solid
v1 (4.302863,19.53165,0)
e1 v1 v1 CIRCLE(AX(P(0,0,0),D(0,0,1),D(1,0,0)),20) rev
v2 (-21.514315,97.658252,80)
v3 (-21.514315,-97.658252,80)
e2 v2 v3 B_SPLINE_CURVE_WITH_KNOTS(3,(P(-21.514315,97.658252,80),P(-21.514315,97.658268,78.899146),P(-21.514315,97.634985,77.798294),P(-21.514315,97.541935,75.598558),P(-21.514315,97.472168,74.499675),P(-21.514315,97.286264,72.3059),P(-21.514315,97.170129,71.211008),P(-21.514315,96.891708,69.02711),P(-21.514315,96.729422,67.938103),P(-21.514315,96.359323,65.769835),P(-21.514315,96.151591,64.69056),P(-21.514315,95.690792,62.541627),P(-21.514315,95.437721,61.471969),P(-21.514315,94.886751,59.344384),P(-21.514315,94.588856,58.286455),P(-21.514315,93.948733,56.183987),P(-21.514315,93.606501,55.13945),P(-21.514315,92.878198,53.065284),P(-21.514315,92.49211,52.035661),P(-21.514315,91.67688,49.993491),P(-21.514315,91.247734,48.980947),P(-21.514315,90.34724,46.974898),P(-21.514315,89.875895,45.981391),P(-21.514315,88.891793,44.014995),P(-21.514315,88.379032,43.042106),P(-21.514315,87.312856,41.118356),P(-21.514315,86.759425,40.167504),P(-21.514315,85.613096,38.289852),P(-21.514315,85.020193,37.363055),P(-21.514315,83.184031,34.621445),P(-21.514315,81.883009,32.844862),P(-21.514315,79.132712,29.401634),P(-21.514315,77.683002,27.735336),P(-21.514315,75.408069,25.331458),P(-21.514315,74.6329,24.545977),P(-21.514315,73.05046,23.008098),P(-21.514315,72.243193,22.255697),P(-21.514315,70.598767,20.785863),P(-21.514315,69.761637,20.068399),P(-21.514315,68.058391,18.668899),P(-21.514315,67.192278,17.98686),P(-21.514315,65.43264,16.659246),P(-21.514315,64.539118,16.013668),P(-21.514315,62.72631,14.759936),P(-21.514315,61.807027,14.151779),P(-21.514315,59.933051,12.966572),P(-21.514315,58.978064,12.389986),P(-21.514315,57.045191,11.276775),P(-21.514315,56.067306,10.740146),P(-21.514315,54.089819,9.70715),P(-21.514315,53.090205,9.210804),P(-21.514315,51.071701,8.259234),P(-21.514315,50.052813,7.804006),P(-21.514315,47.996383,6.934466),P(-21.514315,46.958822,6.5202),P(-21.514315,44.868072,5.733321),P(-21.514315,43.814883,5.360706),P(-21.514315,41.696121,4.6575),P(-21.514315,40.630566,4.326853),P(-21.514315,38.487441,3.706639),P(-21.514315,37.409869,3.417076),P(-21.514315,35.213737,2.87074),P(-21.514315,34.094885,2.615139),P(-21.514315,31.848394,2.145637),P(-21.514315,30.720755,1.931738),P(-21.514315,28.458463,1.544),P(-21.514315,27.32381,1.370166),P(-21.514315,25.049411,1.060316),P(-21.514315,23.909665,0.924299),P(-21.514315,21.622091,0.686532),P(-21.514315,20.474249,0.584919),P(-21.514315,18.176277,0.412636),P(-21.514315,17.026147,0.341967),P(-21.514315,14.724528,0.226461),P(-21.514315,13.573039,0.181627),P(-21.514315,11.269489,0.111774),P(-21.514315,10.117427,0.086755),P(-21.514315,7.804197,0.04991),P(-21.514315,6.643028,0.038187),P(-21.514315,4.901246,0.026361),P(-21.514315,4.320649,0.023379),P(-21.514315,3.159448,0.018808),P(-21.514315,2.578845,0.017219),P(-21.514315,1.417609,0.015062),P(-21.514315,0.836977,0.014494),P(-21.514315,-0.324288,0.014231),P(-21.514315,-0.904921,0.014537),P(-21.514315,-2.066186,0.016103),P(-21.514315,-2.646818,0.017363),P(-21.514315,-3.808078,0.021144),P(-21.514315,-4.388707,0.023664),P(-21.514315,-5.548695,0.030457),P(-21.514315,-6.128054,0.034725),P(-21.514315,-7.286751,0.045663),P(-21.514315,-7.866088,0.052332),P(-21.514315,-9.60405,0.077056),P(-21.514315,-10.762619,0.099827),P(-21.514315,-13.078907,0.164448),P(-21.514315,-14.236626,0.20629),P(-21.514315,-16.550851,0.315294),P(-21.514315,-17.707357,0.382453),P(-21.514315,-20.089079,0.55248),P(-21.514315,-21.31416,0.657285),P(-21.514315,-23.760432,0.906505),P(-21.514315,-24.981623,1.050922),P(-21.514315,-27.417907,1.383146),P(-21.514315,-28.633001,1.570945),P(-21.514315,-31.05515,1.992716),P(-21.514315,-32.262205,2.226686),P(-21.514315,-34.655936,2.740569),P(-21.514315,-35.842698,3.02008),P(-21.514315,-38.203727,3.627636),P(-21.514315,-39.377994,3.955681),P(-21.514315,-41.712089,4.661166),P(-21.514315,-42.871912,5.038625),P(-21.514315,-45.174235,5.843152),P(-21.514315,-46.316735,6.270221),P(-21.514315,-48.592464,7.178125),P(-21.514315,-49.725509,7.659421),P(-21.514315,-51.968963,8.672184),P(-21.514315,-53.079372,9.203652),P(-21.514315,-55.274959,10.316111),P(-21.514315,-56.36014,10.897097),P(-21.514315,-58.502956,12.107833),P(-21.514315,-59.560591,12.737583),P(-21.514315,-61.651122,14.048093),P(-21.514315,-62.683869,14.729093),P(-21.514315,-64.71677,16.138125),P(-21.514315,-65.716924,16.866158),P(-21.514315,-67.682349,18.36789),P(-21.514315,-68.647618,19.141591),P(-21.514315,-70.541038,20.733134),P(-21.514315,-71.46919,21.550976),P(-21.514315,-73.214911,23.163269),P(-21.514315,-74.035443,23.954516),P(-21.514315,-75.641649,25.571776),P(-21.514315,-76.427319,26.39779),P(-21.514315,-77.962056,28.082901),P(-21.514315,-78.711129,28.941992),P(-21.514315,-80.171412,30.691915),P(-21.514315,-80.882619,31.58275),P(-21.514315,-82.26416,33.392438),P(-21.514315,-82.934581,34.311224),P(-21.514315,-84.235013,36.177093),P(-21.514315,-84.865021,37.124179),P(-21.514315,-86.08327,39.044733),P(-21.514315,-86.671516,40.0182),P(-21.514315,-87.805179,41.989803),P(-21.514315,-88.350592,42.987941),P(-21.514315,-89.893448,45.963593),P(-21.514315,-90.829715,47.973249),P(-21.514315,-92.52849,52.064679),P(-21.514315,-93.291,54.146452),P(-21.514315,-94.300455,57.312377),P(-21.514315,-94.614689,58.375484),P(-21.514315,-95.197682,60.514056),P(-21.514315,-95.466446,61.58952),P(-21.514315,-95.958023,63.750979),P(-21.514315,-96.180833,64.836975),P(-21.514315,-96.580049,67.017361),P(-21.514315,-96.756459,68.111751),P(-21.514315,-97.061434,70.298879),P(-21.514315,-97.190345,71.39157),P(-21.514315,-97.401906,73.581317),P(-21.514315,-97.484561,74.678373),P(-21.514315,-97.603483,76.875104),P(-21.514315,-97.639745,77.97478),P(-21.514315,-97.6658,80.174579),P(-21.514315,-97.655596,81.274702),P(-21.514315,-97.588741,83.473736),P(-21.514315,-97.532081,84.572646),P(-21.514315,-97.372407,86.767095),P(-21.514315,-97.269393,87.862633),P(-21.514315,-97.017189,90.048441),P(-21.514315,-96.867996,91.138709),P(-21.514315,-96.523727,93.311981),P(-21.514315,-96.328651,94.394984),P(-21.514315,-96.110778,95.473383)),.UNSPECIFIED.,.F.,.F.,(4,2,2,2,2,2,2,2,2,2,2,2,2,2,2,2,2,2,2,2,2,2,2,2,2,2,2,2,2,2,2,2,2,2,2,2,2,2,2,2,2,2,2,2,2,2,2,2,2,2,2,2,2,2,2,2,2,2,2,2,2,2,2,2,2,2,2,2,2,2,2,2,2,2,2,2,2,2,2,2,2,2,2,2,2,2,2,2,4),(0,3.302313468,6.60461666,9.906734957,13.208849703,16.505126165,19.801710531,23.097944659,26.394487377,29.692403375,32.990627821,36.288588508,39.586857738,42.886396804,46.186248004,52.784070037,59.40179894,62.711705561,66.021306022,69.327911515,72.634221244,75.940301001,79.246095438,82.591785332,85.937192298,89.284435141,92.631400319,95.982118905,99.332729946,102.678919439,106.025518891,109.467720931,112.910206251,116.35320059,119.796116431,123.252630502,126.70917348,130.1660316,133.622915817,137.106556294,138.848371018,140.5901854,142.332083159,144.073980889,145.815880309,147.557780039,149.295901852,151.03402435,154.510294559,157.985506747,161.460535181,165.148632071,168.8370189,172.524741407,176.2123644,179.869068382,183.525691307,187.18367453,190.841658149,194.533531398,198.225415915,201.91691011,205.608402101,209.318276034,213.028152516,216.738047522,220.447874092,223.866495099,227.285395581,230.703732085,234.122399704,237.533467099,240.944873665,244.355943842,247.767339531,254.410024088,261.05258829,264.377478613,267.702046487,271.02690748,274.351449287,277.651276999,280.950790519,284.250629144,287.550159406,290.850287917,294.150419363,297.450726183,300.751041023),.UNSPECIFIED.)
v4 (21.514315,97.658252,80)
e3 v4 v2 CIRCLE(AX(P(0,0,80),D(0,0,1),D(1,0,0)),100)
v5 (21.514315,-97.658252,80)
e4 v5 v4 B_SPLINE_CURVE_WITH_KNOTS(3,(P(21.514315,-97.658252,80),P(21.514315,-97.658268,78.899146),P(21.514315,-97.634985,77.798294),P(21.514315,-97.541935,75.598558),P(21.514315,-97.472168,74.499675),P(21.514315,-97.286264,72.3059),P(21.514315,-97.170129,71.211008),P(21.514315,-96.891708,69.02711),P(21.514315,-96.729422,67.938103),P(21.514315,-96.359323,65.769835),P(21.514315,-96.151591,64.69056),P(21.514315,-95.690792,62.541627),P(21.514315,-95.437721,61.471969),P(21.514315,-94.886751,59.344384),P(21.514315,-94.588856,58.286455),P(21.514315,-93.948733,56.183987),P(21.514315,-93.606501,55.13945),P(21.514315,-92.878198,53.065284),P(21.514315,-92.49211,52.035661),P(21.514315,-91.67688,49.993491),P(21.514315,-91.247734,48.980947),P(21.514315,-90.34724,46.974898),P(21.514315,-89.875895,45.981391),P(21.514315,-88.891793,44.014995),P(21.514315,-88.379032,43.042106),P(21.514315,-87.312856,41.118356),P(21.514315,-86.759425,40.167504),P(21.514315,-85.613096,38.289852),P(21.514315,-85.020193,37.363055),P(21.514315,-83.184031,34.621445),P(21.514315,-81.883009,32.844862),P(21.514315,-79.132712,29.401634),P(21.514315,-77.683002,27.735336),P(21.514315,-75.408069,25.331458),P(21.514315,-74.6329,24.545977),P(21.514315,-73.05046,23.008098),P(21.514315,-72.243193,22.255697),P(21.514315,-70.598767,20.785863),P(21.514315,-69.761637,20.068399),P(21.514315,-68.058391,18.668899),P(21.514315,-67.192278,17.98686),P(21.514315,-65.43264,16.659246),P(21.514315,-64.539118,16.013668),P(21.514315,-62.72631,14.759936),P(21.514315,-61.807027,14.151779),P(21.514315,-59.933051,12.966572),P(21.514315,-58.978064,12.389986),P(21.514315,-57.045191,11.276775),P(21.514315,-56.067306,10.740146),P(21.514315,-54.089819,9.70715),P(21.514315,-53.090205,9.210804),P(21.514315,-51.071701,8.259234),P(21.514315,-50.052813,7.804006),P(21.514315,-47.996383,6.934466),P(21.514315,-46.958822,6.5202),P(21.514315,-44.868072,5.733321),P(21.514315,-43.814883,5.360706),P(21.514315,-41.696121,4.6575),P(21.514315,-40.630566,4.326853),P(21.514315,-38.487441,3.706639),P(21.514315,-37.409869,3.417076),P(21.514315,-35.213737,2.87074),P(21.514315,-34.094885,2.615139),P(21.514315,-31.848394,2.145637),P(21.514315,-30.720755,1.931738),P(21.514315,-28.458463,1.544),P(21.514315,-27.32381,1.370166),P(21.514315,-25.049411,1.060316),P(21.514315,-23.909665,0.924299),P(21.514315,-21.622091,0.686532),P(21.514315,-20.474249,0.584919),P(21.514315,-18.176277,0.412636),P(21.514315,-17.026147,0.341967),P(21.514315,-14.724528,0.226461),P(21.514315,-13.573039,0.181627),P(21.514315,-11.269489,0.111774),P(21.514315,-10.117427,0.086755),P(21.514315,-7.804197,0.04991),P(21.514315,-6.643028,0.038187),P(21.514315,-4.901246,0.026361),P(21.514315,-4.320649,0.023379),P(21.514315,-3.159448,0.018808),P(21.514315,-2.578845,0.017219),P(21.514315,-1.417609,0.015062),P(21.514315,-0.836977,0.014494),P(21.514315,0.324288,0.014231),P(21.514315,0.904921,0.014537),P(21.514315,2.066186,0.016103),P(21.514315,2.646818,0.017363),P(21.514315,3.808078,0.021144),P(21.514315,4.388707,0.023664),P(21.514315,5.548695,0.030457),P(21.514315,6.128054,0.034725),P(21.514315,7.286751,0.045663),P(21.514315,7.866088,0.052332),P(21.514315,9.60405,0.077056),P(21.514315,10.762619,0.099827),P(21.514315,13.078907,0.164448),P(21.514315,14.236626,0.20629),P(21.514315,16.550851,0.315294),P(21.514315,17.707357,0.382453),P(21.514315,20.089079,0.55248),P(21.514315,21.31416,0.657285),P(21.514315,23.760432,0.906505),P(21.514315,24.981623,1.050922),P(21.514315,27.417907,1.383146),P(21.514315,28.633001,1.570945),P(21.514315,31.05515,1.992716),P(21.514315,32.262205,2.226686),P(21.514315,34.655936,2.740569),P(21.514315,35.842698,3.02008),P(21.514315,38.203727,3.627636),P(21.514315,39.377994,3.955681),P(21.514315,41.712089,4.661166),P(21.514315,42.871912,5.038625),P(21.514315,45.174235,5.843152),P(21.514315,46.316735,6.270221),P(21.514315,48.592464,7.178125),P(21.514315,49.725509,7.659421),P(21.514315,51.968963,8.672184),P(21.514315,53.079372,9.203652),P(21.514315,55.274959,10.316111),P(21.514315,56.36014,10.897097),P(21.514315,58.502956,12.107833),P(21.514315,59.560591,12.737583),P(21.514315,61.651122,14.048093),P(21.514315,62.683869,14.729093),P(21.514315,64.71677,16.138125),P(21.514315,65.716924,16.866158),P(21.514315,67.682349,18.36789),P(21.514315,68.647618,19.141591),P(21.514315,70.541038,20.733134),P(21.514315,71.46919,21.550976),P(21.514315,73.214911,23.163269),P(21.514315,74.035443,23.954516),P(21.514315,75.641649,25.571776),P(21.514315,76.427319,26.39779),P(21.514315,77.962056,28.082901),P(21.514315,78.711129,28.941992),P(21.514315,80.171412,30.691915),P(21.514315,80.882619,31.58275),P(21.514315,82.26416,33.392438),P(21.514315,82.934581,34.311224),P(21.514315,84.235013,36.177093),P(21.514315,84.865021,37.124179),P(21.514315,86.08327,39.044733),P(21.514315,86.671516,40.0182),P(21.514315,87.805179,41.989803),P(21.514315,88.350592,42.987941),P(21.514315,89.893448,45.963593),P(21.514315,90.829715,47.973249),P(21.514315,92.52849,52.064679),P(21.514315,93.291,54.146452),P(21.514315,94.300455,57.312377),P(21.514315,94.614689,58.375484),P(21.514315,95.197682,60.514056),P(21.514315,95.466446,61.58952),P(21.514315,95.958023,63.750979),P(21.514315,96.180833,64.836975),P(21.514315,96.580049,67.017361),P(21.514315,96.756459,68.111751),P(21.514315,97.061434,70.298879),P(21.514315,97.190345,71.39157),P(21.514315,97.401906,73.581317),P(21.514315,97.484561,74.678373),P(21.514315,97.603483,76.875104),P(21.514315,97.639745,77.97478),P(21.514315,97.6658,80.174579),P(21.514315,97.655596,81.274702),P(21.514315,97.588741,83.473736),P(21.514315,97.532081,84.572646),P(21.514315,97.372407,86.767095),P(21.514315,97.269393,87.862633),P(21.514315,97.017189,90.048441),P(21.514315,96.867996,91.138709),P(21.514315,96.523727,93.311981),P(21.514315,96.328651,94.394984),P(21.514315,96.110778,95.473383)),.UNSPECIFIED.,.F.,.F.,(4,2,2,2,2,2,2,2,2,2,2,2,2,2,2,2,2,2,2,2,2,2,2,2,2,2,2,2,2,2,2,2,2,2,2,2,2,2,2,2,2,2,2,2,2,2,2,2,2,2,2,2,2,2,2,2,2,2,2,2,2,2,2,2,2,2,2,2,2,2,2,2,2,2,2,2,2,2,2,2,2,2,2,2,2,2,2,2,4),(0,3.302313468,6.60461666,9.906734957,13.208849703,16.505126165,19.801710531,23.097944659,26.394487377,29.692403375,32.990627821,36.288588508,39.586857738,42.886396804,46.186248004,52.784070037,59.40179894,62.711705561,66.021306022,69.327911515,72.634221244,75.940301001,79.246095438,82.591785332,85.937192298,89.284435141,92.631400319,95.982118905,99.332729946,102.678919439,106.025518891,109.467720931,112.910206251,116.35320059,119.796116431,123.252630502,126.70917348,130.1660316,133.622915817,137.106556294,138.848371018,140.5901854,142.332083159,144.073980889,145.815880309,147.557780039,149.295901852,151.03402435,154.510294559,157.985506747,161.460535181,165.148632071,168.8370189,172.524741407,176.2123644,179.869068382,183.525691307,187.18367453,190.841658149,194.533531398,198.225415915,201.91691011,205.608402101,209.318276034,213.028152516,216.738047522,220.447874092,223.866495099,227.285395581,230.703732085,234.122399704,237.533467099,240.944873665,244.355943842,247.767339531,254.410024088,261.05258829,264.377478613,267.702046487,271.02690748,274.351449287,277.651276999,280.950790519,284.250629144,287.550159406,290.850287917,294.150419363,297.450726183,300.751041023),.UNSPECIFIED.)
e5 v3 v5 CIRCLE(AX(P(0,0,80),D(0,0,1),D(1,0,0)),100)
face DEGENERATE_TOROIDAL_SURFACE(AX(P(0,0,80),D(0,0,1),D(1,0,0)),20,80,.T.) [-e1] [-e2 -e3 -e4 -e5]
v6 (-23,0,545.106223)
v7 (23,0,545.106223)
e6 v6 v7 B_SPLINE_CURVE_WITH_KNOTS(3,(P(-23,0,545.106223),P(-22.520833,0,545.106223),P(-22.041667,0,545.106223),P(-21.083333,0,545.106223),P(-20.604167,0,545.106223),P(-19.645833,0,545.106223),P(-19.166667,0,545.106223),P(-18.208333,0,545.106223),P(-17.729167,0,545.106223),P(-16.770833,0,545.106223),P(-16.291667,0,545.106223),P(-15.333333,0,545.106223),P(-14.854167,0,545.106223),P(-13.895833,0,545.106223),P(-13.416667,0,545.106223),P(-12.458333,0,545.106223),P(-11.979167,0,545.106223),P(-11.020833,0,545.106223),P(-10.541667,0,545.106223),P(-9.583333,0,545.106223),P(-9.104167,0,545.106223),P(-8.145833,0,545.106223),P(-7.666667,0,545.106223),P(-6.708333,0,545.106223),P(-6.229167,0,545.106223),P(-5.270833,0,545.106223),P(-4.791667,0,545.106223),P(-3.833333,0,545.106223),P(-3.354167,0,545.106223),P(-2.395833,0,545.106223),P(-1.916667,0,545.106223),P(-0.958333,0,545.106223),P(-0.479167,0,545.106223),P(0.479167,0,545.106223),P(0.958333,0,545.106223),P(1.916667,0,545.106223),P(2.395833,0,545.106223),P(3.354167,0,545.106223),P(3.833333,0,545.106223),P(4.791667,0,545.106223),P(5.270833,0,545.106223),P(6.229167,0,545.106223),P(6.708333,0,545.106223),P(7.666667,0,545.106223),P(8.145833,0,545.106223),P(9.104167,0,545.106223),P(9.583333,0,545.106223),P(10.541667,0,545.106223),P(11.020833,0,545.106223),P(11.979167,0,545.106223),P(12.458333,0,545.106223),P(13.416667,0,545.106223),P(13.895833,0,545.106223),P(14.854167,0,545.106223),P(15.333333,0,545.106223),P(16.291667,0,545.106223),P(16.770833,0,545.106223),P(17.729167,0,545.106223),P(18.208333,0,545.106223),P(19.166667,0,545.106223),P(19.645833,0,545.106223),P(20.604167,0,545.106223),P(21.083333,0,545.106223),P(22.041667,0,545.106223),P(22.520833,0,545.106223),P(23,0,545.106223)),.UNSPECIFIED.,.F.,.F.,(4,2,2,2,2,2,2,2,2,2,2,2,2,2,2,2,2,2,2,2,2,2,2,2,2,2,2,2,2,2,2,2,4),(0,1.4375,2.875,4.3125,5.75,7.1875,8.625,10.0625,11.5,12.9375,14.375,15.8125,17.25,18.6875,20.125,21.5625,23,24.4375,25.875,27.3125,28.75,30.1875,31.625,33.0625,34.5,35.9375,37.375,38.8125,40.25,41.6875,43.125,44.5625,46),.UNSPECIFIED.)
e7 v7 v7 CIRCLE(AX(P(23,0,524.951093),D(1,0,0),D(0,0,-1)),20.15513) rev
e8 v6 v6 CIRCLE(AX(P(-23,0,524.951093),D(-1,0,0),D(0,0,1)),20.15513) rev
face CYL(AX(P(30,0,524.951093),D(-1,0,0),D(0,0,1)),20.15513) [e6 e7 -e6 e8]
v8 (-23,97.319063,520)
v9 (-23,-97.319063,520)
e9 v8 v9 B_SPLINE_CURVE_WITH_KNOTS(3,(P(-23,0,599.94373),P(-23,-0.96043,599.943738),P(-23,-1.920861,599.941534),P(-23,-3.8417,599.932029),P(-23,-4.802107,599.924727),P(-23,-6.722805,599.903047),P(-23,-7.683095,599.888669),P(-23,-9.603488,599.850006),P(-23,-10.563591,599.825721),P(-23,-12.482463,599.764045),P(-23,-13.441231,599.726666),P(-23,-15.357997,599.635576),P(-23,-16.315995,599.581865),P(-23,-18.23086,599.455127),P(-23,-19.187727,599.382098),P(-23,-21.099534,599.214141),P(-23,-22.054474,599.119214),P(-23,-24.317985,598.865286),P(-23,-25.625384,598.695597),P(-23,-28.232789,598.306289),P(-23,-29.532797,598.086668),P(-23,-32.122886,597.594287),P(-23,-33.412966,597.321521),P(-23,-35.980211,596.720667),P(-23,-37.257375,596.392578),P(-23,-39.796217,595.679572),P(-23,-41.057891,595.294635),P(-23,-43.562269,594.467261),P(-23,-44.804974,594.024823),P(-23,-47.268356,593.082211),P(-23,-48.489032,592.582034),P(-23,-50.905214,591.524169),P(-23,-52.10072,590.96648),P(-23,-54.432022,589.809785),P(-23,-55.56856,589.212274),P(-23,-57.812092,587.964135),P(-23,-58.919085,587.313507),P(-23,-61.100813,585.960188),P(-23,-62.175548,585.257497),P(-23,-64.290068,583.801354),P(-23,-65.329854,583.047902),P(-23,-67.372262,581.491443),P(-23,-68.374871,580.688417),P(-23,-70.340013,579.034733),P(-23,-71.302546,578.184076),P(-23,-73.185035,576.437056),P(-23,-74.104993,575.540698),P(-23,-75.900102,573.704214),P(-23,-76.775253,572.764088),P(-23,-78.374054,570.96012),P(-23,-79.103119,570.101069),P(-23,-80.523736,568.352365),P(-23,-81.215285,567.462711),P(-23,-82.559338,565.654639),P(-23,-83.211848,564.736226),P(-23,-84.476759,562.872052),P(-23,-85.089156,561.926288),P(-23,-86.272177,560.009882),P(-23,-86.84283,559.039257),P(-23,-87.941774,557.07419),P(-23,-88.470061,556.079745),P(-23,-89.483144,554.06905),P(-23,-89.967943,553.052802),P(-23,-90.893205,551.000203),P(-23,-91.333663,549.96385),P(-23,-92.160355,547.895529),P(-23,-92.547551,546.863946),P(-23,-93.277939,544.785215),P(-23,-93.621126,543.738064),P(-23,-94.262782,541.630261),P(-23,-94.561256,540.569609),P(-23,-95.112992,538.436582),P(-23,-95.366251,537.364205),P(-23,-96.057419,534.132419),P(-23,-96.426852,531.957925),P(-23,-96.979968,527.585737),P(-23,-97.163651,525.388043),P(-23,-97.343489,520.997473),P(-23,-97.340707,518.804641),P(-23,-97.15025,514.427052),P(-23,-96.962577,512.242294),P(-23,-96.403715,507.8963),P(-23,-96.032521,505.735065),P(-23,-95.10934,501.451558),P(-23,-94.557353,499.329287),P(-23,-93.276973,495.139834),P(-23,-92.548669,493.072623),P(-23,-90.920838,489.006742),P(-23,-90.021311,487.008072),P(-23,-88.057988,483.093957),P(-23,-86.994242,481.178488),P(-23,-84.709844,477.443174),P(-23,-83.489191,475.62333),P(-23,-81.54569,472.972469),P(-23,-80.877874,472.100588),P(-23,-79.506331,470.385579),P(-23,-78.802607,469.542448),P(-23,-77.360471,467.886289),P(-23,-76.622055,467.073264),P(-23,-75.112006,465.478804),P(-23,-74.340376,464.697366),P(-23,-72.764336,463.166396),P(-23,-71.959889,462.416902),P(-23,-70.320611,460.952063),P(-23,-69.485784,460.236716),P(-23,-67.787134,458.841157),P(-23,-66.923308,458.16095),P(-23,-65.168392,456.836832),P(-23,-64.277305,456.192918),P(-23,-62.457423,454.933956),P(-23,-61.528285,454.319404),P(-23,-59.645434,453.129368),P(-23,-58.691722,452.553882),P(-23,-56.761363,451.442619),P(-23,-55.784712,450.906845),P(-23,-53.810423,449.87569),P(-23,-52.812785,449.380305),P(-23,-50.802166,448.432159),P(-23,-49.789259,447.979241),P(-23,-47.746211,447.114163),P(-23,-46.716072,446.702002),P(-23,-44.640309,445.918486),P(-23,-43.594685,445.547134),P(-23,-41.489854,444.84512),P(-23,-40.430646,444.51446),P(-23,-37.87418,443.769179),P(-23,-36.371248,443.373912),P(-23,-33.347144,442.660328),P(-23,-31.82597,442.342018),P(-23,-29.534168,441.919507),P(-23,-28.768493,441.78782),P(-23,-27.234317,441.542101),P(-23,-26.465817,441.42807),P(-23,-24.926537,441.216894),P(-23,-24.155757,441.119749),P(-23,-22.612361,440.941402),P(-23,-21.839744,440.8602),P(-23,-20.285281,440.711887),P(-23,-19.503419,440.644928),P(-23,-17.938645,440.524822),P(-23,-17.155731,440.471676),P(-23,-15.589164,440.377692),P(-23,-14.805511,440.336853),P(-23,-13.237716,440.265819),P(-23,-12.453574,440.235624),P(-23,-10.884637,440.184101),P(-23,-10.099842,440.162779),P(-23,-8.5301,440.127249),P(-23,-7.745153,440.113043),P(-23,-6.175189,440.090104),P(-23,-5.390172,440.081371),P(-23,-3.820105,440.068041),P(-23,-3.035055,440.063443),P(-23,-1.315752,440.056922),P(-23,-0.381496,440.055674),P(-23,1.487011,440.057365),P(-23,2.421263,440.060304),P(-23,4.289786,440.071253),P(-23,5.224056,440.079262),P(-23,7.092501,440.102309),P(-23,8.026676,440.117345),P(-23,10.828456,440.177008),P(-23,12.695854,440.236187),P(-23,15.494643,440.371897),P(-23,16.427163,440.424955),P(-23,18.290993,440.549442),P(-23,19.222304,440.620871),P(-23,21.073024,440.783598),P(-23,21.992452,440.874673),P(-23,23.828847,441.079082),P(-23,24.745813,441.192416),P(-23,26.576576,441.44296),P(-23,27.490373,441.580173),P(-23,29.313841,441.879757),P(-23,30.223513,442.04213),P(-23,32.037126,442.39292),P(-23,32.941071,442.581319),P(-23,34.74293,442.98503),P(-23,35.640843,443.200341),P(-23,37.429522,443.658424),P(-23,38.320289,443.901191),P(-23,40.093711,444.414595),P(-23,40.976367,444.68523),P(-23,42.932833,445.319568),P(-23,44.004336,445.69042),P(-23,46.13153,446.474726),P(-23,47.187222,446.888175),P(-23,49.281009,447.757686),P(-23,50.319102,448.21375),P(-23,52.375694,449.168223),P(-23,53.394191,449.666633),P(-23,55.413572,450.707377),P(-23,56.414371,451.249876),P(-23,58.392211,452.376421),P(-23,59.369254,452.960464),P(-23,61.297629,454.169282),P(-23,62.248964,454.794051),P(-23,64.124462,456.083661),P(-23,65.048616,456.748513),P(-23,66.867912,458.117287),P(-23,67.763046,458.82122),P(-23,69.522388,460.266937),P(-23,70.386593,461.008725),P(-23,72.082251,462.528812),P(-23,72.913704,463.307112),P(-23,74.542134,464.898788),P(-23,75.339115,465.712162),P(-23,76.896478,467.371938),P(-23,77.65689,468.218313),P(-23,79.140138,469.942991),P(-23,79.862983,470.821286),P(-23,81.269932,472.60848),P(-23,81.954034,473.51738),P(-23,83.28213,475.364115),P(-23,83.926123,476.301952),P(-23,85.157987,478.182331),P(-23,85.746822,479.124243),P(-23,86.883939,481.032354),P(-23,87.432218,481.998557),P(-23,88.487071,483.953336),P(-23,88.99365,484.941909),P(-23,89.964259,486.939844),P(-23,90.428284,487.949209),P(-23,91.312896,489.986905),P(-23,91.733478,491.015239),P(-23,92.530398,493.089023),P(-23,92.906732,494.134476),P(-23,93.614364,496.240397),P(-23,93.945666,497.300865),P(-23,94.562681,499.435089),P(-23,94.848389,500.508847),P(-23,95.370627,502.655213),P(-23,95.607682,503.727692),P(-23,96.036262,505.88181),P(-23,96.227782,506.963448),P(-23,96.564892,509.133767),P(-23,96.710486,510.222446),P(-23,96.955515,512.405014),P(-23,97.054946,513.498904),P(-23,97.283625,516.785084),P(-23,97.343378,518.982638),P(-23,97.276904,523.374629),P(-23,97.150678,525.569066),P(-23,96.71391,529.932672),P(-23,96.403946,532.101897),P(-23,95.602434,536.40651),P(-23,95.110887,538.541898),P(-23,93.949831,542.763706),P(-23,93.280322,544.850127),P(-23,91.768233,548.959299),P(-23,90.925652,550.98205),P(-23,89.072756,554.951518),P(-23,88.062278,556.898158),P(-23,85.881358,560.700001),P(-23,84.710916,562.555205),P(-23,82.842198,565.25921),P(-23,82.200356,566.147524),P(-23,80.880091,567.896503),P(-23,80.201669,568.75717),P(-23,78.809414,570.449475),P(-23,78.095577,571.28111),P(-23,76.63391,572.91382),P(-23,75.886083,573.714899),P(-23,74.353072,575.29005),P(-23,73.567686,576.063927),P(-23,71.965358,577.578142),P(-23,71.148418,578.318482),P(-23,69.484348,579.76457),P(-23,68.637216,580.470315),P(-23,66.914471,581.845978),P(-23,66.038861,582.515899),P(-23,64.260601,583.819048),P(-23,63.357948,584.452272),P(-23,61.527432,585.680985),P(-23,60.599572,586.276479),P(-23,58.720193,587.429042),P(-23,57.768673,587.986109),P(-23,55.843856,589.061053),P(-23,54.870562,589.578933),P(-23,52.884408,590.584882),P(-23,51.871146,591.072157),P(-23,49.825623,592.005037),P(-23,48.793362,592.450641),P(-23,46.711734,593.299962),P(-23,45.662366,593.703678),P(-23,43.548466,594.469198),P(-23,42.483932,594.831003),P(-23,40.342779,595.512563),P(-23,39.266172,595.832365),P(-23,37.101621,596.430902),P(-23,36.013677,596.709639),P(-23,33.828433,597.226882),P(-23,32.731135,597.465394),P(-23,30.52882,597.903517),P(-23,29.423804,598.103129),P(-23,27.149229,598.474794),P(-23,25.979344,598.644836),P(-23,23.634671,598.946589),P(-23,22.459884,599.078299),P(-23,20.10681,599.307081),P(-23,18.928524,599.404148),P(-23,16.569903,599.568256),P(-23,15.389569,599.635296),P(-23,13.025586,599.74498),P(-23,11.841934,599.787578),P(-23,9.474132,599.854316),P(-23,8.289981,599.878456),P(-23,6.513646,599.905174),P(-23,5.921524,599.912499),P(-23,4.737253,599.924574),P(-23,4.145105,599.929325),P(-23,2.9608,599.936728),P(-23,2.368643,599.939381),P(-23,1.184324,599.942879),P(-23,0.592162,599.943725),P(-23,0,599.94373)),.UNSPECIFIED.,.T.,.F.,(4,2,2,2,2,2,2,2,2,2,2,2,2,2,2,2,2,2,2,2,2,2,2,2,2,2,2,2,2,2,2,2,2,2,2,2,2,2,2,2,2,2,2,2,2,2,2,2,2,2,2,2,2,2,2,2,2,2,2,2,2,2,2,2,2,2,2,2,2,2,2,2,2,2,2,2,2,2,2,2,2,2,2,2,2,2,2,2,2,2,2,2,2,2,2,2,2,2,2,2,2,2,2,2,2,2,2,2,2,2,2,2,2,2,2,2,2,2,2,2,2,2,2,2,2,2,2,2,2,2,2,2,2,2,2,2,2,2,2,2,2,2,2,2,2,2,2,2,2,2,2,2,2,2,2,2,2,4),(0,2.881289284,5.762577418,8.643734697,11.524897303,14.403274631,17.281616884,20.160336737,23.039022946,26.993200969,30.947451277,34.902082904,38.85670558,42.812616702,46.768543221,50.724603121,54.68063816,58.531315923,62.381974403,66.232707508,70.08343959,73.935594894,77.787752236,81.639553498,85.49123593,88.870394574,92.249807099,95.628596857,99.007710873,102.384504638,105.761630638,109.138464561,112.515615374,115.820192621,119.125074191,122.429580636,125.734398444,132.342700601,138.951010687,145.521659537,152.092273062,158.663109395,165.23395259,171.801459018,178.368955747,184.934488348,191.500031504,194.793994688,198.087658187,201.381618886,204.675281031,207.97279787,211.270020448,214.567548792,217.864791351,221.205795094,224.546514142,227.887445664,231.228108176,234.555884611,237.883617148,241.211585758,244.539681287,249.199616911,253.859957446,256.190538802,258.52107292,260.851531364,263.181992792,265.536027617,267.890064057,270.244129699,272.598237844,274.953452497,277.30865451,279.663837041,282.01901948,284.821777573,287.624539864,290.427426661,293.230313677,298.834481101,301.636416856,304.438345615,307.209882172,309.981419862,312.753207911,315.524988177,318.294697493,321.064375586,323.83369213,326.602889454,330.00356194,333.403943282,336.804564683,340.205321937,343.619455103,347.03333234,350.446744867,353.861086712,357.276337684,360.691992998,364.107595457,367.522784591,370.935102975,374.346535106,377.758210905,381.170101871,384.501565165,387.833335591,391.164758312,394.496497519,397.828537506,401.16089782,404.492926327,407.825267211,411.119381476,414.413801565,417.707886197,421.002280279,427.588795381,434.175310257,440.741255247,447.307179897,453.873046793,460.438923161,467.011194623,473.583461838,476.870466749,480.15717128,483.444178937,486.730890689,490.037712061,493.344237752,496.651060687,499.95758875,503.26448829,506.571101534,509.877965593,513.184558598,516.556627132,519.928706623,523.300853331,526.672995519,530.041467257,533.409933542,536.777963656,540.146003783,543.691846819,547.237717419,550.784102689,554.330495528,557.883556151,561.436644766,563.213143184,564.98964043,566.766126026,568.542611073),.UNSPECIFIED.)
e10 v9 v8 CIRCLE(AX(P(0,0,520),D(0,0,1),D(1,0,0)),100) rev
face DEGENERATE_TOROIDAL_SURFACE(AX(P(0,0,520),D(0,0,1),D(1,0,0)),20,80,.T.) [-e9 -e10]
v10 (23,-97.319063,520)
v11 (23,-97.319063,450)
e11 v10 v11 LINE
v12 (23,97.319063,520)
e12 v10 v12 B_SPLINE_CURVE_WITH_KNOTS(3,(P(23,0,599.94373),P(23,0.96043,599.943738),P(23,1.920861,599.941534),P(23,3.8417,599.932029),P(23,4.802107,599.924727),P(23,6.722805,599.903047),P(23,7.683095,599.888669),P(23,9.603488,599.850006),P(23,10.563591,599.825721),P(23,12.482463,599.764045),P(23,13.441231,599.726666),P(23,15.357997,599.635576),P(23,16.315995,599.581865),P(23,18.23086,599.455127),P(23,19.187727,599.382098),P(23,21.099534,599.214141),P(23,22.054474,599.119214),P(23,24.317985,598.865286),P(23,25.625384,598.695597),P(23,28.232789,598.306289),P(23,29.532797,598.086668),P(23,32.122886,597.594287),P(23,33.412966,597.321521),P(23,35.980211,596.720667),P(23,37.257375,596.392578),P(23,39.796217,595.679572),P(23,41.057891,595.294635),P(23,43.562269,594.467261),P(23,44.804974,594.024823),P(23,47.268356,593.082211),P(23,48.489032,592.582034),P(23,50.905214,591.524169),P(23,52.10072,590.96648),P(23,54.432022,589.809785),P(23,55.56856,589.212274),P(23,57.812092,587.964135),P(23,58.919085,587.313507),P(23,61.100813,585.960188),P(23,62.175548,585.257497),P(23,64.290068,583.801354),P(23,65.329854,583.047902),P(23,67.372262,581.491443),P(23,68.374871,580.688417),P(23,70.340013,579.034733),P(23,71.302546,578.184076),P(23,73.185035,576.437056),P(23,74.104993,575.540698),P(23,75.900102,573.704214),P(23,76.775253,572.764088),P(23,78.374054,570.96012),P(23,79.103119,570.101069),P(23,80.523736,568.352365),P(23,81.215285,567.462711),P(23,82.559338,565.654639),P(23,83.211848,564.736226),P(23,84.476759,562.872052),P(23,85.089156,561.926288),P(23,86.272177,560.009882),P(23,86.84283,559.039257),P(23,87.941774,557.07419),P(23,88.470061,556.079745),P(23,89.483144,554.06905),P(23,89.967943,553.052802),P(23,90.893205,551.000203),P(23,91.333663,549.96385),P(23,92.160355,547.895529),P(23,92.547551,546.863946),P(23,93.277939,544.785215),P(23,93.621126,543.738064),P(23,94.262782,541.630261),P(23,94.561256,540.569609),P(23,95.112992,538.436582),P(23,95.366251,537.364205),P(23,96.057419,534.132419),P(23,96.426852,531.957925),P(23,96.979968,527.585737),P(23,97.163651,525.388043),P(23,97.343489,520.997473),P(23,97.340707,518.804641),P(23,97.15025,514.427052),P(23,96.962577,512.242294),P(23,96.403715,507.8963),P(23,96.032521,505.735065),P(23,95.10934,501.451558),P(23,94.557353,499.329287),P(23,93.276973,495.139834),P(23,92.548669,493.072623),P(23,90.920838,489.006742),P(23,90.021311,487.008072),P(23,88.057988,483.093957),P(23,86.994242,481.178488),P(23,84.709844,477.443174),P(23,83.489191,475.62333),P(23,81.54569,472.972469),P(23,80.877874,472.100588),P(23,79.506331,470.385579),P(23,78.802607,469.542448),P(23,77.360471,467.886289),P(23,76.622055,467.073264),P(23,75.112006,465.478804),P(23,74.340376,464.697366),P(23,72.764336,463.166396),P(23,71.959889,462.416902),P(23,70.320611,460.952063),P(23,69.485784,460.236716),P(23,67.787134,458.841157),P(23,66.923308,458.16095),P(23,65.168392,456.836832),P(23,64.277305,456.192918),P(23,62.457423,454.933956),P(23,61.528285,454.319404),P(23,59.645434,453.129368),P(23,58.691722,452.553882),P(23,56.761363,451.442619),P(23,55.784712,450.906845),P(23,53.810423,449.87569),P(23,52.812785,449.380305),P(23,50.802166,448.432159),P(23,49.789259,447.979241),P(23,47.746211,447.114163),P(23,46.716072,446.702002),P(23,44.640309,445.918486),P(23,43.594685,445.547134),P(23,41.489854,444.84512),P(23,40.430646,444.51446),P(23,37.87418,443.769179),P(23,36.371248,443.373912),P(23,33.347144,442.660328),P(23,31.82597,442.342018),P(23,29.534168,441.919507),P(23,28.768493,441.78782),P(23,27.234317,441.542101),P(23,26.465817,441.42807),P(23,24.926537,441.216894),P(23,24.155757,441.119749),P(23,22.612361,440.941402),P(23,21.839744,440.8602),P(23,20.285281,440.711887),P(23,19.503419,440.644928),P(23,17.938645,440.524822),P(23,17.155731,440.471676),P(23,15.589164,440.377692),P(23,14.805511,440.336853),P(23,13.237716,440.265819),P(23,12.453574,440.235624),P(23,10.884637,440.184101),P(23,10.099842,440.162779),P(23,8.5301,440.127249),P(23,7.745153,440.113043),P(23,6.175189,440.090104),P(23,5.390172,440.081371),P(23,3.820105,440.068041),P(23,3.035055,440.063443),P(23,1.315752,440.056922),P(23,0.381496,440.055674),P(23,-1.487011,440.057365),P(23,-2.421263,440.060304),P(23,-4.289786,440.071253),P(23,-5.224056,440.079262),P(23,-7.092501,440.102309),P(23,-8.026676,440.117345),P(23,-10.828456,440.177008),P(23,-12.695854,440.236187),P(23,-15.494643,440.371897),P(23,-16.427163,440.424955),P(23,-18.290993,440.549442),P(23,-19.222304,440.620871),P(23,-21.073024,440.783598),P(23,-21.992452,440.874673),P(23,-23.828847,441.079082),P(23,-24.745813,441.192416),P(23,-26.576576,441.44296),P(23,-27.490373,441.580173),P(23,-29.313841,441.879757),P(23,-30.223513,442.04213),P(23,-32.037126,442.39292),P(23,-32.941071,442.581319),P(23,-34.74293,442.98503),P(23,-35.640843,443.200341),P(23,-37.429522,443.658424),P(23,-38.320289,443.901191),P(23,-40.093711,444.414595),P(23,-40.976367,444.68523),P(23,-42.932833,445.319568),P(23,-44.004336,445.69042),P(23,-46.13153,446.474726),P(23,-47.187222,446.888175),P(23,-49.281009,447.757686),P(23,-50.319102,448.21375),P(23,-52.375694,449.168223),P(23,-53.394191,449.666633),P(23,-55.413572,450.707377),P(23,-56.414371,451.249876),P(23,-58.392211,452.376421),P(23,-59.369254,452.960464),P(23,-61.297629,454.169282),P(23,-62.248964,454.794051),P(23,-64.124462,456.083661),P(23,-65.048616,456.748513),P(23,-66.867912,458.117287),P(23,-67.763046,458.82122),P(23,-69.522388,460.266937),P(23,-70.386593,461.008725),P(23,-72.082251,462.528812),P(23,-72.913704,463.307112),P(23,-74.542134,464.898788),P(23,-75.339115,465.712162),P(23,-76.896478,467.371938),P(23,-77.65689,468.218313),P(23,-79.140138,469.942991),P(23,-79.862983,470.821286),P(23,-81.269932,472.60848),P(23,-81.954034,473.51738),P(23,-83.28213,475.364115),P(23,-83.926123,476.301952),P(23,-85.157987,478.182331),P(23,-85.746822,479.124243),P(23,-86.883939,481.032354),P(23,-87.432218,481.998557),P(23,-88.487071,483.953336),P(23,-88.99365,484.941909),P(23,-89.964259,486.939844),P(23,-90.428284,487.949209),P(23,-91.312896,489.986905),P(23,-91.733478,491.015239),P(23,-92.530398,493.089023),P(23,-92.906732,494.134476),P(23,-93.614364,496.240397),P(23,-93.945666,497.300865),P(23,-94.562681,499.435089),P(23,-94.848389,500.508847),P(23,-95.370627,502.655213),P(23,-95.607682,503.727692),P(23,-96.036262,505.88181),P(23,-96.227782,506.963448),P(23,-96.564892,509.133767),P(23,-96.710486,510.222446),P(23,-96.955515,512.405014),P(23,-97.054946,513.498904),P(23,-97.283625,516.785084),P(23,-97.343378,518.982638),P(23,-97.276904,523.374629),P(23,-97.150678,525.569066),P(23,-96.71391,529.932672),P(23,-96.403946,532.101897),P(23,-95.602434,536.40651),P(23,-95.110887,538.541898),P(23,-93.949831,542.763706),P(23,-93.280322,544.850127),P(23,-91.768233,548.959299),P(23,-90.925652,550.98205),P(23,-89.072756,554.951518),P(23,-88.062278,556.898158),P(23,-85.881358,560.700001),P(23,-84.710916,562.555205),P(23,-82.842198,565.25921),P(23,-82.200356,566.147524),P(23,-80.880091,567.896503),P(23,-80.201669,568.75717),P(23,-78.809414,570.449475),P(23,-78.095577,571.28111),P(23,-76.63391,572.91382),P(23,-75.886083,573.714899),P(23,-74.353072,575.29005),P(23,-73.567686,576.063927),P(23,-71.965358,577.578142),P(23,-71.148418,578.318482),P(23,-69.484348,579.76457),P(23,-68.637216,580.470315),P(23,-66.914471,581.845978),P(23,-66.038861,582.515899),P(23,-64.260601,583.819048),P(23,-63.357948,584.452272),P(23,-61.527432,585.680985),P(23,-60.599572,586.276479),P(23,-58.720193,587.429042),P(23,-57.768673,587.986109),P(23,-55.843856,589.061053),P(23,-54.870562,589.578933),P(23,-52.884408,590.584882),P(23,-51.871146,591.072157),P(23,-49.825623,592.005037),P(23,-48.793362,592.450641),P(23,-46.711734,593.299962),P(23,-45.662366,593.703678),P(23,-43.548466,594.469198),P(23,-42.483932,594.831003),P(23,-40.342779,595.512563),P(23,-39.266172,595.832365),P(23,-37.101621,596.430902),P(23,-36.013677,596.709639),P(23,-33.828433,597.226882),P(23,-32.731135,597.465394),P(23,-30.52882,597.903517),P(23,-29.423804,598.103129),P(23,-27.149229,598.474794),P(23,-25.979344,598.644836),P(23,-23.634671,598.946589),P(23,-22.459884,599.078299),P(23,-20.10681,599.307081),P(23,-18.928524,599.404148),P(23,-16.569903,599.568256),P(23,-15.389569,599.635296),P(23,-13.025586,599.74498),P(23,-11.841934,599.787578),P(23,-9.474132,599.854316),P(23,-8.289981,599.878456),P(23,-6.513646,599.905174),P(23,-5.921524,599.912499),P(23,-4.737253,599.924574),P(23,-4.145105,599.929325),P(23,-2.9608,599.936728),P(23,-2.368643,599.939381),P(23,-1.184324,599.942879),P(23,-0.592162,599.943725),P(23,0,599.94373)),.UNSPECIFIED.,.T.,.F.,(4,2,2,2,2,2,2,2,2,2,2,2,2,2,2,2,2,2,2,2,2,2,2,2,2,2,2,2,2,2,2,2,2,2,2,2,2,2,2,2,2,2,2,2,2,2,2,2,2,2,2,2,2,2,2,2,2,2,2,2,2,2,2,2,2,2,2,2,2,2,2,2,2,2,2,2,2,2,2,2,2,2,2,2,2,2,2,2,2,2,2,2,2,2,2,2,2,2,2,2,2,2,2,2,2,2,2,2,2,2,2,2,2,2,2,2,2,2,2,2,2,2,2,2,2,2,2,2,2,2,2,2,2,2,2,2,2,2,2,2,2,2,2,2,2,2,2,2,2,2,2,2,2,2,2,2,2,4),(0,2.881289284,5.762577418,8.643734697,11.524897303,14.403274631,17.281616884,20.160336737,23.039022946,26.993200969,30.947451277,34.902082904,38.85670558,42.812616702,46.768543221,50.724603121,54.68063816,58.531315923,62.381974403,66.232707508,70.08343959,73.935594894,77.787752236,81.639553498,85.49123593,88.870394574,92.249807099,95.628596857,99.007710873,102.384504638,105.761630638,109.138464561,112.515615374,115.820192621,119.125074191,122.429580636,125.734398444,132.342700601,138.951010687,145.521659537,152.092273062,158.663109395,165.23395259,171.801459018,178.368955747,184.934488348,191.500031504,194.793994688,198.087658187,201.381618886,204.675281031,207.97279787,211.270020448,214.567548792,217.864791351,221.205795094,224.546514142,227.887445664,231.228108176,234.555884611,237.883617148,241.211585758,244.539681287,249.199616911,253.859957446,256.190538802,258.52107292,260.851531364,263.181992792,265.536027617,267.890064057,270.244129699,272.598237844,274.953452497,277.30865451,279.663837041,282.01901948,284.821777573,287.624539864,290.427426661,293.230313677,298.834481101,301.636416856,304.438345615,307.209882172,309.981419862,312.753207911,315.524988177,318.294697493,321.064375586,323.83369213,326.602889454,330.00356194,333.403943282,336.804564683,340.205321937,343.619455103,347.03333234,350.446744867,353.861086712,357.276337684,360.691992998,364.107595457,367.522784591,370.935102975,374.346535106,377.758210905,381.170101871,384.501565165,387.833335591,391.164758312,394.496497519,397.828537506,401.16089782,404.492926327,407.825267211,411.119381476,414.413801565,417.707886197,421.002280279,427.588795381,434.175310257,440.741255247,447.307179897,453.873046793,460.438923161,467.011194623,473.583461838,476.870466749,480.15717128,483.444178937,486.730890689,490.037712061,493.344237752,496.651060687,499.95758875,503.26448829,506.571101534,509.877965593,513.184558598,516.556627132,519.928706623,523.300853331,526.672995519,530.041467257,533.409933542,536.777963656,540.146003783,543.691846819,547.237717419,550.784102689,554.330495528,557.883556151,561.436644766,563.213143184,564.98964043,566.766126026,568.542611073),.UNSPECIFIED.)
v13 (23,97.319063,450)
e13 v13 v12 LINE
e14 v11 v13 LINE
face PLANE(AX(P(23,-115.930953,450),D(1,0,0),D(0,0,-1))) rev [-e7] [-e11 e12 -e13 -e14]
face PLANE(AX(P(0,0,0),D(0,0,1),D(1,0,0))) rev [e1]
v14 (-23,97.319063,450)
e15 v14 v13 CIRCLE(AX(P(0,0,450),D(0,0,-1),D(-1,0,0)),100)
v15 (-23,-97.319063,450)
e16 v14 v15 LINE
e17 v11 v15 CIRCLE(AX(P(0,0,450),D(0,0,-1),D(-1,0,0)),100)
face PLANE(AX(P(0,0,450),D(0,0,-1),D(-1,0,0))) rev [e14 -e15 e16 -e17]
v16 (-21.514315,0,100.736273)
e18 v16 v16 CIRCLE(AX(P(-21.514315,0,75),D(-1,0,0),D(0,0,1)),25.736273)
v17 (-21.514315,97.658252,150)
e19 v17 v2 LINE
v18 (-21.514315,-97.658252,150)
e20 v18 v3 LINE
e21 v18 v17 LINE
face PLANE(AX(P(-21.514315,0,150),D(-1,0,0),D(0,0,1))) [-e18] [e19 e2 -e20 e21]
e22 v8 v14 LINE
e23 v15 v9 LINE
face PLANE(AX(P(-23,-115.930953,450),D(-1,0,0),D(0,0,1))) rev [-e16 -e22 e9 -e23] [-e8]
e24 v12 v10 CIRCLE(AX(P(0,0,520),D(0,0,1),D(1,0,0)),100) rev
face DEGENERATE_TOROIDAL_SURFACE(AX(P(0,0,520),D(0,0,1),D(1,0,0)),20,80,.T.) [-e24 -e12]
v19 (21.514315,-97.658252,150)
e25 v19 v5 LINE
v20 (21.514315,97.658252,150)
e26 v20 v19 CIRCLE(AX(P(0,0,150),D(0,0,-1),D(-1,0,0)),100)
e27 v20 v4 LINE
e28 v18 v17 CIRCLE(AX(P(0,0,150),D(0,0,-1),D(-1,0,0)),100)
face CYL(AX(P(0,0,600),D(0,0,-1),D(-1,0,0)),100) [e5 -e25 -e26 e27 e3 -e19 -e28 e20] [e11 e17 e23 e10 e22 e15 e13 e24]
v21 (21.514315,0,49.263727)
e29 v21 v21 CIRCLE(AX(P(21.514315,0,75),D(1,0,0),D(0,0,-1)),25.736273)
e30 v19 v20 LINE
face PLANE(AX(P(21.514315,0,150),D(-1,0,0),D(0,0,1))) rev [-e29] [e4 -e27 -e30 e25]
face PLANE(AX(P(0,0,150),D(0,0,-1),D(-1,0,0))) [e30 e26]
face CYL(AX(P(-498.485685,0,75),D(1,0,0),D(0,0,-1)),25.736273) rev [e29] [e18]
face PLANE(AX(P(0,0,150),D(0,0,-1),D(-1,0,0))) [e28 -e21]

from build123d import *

# Parameters (mm, degrees)
SKETCH1_R           = 100
BOSS_EXTRUDE1_DEPTH = 600
FILLET2_R           = 80
SKETCH2_W           = 46
SKETCH2_H           = 231.861905776
CUT_EXTRUDE1_DEPTH  = 150
SKETCH3_R           = 20.155129503
BOSS_EXTRUDE2_DEPTH = 30
CUT_EXTRUDE2_DEPTH  = 150
FILLET3_R           = 80
SKETCH5_R           = 25.736273229
CUT_EXTRUDE3_DEPTH  = 520


with BuildPart() as part:
    # Sketch1 → Boss-Extrude1 (new body)
    with BuildSketch(Plane.XY):
        Circle(SKETCH1_R)
    extrude(amount=BOSS_EXTRUDE1_DEPTH)

    # Fillet2
    fillet2_edges = [part.edges().sort_by_distance(p)[0] for p in [
        (-100, 0, 600),
    ]]
    fillet(fillet2_edges, radius=FILLET2_R)

    # Sketch2 → Cut-Extrude1 (cut)
    with BuildSketch(Plane.XY.offset(600)):
        Rectangle(SKETCH2_W, SKETCH2_H)
    extrude(amount=-CUT_EXTRUDE1_DEPTH, mode=Mode.SUBTRACT)

    # Sketch3 → Boss-Extrude2 (add, symmetric)
    with BuildSketch(Plane(origin=(0, 0, 0), x_dir=(0, 0, -1), z_dir=(1, 0, 0))):
        with Locations(Location((-524.951093161, 0, 0), (0, 0, 180))):
            Circle(SKETCH3_R)
    extrude(amount=BOSS_EXTRUDE2_DEPTH, both=True)

    # Sketch4 → Cut-Extrude2 (cut)
    with BuildSketch(Plane(origin=(0, 0, 0), x_dir=(-1, 0, 0), z_dir=(0, 0, -1))):
        with BuildLine():
            ThreePointArc((-21.514315111, 97.658252315), (-100, 0), (-21.514315111, -97.658252315))
            Line((-21.514315111, -97.658252315), (-21.514315111, 97.658252315))
        make_face()
        with BuildLine():
            Line((21.514315111, 97.658252315), (21.514315111, -97.658252315))
            ThreePointArc((21.514315111, -97.658252315), (100, 0), (21.514315111, 97.658252315))
        make_face()
    extrude(amount=-CUT_EXTRUDE2_DEPTH, mode=Mode.SUBTRACT)

    # Fillet3
    # the kernel refuses this fillet: 80 mm, written as the material it takes off along each edge
    with BuildSketch(Plane(origin=(0, 0, 0), x_dir=(-0.7984359735160296, 0.6020797257801578, 0), z_dir=(0.6020797257801578, 0.7984359735160296, 0))) as fillet3_piece_1:
        with BuildLine():
            CenterArc((100 - FILLET3_R, FILLET3_R), FILLET3_R, 270, 90)
            Line((100 - FILLET3_R, 0), (100, 0))
            Line((100, 0), (100, FILLET3_R))
        make_face()
    revolve(axis=Axis((0, 0, 0), (0, 0, 1)), revolution_arc=254.037985384, mode=Mode.SUBTRACT)
    with BuildSketch(Plane(origin=(0, 0, 0), x_dir=(0.79843597351603, -0.6020797257801573, 0), z_dir=(-0.6020797257801573, -0.79843597351603, 0))) as fillet3_piece_2:
        with BuildLine():
            CenterArc((100 - FILLET3_R, FILLET3_R), FILLET3_R, 270, 90)
            Line((100 - FILLET3_R, 0), (100, 0))
            Line((100, 0), (100, FILLET3_R))
        make_face()
    revolve(axis=Axis((0, 0, 0), (0, 0, 1)), revolution_arc=254.037985384, mode=Mode.SUBTRACT)

    # Sketch5 → Cut-Extrude3 (cut)
    with BuildSketch(Plane(origin=(21.514315111, 0, 0), x_dir=(0, 0, -1), z_dir=(1, 0, 0))):
        with Locations((-75, 0)):
            Circle(SKETCH5_R)
    extrude(amount=-CUT_EXTRUDE3_DEPTH, mode=Mode.SUBTRACT)


solid = part.part
